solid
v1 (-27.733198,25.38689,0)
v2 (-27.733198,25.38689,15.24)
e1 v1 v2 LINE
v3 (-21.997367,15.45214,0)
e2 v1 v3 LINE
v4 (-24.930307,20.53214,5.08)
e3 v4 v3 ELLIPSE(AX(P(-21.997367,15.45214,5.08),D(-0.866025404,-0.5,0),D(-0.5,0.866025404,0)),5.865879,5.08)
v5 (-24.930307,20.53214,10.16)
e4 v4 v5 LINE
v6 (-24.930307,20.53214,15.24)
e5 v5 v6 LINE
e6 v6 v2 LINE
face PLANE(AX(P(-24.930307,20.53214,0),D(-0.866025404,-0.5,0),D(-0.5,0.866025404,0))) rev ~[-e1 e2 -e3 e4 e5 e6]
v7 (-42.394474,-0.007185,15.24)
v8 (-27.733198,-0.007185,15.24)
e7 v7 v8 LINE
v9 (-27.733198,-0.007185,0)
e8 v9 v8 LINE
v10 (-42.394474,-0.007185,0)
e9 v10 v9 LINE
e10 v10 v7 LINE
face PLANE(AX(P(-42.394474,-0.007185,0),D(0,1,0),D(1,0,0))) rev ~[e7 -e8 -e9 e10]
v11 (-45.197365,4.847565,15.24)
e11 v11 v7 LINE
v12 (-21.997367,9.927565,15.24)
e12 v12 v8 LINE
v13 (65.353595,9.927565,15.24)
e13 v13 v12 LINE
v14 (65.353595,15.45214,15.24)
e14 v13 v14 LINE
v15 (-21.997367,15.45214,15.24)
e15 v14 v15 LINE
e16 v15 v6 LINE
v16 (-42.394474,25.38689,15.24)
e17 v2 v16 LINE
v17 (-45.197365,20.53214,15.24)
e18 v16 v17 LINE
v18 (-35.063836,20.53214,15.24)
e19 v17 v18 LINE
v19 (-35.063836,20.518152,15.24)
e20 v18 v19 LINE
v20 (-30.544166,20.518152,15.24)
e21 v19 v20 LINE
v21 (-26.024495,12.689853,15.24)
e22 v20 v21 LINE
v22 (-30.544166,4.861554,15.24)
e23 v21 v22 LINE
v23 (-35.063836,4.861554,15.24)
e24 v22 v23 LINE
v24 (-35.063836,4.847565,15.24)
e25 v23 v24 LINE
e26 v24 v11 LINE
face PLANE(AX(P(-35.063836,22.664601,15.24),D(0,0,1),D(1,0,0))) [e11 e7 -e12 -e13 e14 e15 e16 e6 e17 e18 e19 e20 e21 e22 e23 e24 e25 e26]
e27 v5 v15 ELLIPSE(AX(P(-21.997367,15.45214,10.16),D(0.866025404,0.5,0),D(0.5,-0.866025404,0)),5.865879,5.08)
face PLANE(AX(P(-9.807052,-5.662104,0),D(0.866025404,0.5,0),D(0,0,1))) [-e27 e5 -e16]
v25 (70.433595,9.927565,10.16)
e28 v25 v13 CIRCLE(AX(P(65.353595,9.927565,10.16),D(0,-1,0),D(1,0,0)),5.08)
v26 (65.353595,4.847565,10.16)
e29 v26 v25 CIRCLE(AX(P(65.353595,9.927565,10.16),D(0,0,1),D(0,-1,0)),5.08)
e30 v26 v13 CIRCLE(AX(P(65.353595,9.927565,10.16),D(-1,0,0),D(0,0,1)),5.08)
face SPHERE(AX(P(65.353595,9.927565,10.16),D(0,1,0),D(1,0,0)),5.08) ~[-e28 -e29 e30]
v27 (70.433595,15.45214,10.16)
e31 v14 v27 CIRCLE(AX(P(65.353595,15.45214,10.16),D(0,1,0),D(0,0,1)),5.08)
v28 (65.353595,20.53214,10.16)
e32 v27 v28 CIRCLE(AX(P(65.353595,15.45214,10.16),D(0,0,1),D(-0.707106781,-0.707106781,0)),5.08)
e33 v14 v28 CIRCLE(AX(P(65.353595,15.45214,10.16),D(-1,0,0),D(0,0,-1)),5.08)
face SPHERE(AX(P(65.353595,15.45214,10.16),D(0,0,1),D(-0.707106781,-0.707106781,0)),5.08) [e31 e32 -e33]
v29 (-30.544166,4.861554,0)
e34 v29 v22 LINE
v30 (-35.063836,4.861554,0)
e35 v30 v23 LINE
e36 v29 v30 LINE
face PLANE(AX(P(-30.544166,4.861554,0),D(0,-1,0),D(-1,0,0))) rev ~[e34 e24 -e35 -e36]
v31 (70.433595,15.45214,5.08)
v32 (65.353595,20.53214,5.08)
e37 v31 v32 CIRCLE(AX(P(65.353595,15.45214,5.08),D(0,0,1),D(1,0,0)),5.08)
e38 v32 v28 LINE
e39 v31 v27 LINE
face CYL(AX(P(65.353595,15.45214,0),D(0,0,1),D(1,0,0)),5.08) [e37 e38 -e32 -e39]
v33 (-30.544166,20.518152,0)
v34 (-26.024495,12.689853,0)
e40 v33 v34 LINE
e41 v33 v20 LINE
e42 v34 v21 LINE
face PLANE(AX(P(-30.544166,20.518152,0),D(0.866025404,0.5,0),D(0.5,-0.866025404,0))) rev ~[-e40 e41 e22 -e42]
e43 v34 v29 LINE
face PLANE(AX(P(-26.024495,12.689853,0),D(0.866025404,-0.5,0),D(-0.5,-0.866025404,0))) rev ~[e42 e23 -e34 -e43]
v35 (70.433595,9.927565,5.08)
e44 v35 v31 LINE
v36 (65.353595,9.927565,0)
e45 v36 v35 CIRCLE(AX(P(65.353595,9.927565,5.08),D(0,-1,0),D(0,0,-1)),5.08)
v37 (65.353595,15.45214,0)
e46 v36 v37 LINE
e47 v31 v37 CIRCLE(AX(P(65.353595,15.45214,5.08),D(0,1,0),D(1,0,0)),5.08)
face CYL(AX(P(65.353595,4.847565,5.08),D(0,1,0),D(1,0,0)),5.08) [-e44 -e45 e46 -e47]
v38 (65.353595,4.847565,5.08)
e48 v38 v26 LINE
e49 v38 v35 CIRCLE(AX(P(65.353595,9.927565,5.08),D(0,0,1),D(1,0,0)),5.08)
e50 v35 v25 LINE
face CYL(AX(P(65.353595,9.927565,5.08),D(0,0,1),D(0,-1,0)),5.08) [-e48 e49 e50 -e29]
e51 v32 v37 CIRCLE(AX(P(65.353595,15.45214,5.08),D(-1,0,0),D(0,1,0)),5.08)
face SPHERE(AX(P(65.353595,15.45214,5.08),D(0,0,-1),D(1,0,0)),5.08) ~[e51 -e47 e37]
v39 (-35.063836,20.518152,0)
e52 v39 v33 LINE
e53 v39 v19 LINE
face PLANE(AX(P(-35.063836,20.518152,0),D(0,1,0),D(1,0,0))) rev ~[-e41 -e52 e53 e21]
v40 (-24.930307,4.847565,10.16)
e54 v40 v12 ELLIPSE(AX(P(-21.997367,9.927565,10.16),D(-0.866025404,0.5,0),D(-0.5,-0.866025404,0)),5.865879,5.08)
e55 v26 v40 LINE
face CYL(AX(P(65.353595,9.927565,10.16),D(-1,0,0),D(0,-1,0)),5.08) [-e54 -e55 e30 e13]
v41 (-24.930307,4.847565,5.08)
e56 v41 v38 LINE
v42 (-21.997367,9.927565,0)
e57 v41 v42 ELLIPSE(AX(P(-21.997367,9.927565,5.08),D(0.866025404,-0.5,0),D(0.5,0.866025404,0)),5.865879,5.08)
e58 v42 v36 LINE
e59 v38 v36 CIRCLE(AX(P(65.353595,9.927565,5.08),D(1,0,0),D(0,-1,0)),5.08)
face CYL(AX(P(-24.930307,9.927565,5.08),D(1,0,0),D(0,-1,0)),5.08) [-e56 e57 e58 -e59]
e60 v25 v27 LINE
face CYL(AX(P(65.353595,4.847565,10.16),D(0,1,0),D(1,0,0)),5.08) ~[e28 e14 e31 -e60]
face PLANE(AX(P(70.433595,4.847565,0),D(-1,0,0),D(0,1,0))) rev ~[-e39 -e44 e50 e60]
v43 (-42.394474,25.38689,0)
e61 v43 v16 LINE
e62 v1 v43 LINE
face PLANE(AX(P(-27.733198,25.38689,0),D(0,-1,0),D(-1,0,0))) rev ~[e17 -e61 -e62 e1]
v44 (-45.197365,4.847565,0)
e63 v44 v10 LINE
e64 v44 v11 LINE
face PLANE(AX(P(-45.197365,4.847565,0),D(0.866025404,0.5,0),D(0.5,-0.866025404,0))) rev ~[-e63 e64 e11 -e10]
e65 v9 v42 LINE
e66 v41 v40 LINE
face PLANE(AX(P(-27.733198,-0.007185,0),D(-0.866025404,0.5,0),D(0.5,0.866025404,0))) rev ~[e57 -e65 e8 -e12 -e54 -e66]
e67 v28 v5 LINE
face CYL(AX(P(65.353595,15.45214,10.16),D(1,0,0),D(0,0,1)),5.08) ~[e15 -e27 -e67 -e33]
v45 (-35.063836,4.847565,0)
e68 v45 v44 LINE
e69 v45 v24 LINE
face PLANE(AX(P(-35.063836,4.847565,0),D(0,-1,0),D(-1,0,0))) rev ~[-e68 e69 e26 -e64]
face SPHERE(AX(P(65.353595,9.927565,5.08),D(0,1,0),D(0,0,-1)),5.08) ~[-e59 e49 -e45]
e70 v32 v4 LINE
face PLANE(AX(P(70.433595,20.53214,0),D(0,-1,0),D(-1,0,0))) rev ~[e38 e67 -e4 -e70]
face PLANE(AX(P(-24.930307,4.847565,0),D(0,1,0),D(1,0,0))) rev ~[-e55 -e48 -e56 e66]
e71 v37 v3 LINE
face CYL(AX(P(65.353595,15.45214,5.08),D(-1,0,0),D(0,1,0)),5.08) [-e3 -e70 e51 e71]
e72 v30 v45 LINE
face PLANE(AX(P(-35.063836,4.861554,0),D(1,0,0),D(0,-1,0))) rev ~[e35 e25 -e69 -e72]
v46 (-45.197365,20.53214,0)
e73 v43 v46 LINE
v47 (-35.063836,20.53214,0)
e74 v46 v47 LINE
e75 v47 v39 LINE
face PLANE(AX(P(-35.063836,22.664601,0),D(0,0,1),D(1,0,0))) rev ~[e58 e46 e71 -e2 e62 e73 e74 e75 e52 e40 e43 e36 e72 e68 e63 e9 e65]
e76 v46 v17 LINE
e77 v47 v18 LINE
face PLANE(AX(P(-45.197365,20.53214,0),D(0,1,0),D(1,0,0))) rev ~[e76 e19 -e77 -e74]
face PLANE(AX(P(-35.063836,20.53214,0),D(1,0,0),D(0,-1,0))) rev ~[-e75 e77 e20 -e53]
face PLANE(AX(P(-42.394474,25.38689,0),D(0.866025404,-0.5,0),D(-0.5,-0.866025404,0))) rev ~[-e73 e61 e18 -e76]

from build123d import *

# Parameters (mm, degrees)
F1_DEPTH     = 15.24
F2_R         = 5.08
F3_R         = 5.08
F4_R         = 5.08
F5_S3_W      = 5.08
F5_S3_H      = 5.08
F5_T4_DEPTH  = 5.08
F5_T10_DEPTH = 102.9839018281


# Not quite as in the source:
# - a fillet or chamfer that OpenCascade refuses, or shapes differently, is made with other operations: its cross-section is extruded or revolved along the edge and cut away or added


with BuildPart() as f1:
    # F0 (on Top) → F1 (new body)
    with BuildSketch(Plane.XY):
        Polygon((-45.1973650922, 20.5321404808), (-35.0638359103, 20.5321404808), (-24.9303067284, 20.5321404808), (-27.7331978752, 25.3868903553), (-42.3944739453, 25.3868903553), align=None)
        Polygon((-24.9303067284, 20.5321404808), (-35.0638359103, 20.5321404808), (-35.0638359103, 20.5181515061), (-30.5441655604, 20.5181515061), (-26.0244952105, 12.6898528267), (-30.5441655604, 4.8615541473), (-35.0638359103, 4.8615541473), (-35.0638359103, 4.8475651727), (-24.9303067284, 4.8475651727), (-20.4025598402, 12.6898528267), align=None)
        Polygon((-27.7331978752, -0.0071847018), (-24.9303067284, 4.8475651727), (-35.0638359103, 4.8475651727), (-45.1973650922, 4.8475651727), (-42.3944739453, -0.0071847018), align=None)
        Polygon((70.4335950998, 20.5321404808), (-24.9303067284, 20.5321404808), (-20.4025598402, 12.6898528267), (-24.9303067284, 4.8475651727), (70.4335950998, 4.8475651727), align=None)
    extrude(amount=F1_DEPTH)

    # F2
    f2_edges = [f1.edges().sort_by_distance(p)[0] for p in [
        (70.433595, 20.53214, 7.62),
        (70.433595, 12.689853, 15.24),
    ]]
    fillet(f2_edges, radius=F2_R)

    # F3
    f3_edges = [f1.edges().sort_by_distance(p)[0] for p in [
        (70.433595, 10.149853, 0),
    ]]
    fillet(f3_edges, radius=F3_R)

    # F4
    f4_edges = [f1.edges().sort_by_distance(p)[0] for p in [
        (70.433595, 4.847565, 7.62),
    ]]
    fillet(f4_edges, radius=F4_R)

    # F5: fillet of radius 5.08 on 1 edges, made by hand


with BuildPart() as f5_tool2:
    # F5_s3 → F5_t4 (new body)
    with BuildSketch(Plane.XY.offset(10.16)):
        with Locations((67.8935950998, 17.9921404808)):
            Rectangle(F5_S3_W, F5_S3_H)
    extrude(amount=F5_T4_DEPTH)

    # F5_s5 → F5_t6 (revolve, cut)
    with BuildSketch(Plane(origin=(65.3535950998, 15.4521404808, 10.16), x_dir=(-0.7071067812, -0.7071067812, 0), z_dir=(-0.7071067812, 0.7071067812, 0))):
        with BuildLine():
            ThreePointArc((0, -5.08), (5.08, 0), (0, 5.08))
            Line((0, 5.08), (0, -5.08))
        make_face()
    revolve(axis=Axis((65.3535950998, 15.4521404808, 10.16), (0, 0, 1)), mode=Mode.SUBTRACT)


with BuildPart() as f1_1:
    add(f1.part)

    # F5_t1: cut F5_tool2
    add(f5_tool2.part, mode=Mode.SUBTRACT)


with BuildPart() as f5_tool8:
    # F5_s9 → F5_t10 (new body)
    with BuildSketch(Plane.YZ.offset(65.3535950998)):
        with BuildLine():
            ThreePointArc((15.4521404808, 15.24), (19.0442429292, 13.7521024484), (20.5321404808, 10.16))
            Line((20.5321404808, 10.16), (20.5321404808, 15.24))
            Line((20.5321404808, 15.24), (15.4521404808, 15.24))
        make_face()
    extrude(amount=-F5_T10_DEPTH)

    split(bisect_by=Plane(origin=(-9.8070524211, -5.6621043553, 0), x_dir=(0, 0, 1), z_dir=(0.8660254038, 0.5, 0)), keep=Keep.TOP)


with BuildPart() as f1_2:
    add(f1_1.part)

    # F5_t7: cut F5_tool8
    add(f5_tool8.part, mode=Mode.SUBTRACT)


solid = f1_2.part
